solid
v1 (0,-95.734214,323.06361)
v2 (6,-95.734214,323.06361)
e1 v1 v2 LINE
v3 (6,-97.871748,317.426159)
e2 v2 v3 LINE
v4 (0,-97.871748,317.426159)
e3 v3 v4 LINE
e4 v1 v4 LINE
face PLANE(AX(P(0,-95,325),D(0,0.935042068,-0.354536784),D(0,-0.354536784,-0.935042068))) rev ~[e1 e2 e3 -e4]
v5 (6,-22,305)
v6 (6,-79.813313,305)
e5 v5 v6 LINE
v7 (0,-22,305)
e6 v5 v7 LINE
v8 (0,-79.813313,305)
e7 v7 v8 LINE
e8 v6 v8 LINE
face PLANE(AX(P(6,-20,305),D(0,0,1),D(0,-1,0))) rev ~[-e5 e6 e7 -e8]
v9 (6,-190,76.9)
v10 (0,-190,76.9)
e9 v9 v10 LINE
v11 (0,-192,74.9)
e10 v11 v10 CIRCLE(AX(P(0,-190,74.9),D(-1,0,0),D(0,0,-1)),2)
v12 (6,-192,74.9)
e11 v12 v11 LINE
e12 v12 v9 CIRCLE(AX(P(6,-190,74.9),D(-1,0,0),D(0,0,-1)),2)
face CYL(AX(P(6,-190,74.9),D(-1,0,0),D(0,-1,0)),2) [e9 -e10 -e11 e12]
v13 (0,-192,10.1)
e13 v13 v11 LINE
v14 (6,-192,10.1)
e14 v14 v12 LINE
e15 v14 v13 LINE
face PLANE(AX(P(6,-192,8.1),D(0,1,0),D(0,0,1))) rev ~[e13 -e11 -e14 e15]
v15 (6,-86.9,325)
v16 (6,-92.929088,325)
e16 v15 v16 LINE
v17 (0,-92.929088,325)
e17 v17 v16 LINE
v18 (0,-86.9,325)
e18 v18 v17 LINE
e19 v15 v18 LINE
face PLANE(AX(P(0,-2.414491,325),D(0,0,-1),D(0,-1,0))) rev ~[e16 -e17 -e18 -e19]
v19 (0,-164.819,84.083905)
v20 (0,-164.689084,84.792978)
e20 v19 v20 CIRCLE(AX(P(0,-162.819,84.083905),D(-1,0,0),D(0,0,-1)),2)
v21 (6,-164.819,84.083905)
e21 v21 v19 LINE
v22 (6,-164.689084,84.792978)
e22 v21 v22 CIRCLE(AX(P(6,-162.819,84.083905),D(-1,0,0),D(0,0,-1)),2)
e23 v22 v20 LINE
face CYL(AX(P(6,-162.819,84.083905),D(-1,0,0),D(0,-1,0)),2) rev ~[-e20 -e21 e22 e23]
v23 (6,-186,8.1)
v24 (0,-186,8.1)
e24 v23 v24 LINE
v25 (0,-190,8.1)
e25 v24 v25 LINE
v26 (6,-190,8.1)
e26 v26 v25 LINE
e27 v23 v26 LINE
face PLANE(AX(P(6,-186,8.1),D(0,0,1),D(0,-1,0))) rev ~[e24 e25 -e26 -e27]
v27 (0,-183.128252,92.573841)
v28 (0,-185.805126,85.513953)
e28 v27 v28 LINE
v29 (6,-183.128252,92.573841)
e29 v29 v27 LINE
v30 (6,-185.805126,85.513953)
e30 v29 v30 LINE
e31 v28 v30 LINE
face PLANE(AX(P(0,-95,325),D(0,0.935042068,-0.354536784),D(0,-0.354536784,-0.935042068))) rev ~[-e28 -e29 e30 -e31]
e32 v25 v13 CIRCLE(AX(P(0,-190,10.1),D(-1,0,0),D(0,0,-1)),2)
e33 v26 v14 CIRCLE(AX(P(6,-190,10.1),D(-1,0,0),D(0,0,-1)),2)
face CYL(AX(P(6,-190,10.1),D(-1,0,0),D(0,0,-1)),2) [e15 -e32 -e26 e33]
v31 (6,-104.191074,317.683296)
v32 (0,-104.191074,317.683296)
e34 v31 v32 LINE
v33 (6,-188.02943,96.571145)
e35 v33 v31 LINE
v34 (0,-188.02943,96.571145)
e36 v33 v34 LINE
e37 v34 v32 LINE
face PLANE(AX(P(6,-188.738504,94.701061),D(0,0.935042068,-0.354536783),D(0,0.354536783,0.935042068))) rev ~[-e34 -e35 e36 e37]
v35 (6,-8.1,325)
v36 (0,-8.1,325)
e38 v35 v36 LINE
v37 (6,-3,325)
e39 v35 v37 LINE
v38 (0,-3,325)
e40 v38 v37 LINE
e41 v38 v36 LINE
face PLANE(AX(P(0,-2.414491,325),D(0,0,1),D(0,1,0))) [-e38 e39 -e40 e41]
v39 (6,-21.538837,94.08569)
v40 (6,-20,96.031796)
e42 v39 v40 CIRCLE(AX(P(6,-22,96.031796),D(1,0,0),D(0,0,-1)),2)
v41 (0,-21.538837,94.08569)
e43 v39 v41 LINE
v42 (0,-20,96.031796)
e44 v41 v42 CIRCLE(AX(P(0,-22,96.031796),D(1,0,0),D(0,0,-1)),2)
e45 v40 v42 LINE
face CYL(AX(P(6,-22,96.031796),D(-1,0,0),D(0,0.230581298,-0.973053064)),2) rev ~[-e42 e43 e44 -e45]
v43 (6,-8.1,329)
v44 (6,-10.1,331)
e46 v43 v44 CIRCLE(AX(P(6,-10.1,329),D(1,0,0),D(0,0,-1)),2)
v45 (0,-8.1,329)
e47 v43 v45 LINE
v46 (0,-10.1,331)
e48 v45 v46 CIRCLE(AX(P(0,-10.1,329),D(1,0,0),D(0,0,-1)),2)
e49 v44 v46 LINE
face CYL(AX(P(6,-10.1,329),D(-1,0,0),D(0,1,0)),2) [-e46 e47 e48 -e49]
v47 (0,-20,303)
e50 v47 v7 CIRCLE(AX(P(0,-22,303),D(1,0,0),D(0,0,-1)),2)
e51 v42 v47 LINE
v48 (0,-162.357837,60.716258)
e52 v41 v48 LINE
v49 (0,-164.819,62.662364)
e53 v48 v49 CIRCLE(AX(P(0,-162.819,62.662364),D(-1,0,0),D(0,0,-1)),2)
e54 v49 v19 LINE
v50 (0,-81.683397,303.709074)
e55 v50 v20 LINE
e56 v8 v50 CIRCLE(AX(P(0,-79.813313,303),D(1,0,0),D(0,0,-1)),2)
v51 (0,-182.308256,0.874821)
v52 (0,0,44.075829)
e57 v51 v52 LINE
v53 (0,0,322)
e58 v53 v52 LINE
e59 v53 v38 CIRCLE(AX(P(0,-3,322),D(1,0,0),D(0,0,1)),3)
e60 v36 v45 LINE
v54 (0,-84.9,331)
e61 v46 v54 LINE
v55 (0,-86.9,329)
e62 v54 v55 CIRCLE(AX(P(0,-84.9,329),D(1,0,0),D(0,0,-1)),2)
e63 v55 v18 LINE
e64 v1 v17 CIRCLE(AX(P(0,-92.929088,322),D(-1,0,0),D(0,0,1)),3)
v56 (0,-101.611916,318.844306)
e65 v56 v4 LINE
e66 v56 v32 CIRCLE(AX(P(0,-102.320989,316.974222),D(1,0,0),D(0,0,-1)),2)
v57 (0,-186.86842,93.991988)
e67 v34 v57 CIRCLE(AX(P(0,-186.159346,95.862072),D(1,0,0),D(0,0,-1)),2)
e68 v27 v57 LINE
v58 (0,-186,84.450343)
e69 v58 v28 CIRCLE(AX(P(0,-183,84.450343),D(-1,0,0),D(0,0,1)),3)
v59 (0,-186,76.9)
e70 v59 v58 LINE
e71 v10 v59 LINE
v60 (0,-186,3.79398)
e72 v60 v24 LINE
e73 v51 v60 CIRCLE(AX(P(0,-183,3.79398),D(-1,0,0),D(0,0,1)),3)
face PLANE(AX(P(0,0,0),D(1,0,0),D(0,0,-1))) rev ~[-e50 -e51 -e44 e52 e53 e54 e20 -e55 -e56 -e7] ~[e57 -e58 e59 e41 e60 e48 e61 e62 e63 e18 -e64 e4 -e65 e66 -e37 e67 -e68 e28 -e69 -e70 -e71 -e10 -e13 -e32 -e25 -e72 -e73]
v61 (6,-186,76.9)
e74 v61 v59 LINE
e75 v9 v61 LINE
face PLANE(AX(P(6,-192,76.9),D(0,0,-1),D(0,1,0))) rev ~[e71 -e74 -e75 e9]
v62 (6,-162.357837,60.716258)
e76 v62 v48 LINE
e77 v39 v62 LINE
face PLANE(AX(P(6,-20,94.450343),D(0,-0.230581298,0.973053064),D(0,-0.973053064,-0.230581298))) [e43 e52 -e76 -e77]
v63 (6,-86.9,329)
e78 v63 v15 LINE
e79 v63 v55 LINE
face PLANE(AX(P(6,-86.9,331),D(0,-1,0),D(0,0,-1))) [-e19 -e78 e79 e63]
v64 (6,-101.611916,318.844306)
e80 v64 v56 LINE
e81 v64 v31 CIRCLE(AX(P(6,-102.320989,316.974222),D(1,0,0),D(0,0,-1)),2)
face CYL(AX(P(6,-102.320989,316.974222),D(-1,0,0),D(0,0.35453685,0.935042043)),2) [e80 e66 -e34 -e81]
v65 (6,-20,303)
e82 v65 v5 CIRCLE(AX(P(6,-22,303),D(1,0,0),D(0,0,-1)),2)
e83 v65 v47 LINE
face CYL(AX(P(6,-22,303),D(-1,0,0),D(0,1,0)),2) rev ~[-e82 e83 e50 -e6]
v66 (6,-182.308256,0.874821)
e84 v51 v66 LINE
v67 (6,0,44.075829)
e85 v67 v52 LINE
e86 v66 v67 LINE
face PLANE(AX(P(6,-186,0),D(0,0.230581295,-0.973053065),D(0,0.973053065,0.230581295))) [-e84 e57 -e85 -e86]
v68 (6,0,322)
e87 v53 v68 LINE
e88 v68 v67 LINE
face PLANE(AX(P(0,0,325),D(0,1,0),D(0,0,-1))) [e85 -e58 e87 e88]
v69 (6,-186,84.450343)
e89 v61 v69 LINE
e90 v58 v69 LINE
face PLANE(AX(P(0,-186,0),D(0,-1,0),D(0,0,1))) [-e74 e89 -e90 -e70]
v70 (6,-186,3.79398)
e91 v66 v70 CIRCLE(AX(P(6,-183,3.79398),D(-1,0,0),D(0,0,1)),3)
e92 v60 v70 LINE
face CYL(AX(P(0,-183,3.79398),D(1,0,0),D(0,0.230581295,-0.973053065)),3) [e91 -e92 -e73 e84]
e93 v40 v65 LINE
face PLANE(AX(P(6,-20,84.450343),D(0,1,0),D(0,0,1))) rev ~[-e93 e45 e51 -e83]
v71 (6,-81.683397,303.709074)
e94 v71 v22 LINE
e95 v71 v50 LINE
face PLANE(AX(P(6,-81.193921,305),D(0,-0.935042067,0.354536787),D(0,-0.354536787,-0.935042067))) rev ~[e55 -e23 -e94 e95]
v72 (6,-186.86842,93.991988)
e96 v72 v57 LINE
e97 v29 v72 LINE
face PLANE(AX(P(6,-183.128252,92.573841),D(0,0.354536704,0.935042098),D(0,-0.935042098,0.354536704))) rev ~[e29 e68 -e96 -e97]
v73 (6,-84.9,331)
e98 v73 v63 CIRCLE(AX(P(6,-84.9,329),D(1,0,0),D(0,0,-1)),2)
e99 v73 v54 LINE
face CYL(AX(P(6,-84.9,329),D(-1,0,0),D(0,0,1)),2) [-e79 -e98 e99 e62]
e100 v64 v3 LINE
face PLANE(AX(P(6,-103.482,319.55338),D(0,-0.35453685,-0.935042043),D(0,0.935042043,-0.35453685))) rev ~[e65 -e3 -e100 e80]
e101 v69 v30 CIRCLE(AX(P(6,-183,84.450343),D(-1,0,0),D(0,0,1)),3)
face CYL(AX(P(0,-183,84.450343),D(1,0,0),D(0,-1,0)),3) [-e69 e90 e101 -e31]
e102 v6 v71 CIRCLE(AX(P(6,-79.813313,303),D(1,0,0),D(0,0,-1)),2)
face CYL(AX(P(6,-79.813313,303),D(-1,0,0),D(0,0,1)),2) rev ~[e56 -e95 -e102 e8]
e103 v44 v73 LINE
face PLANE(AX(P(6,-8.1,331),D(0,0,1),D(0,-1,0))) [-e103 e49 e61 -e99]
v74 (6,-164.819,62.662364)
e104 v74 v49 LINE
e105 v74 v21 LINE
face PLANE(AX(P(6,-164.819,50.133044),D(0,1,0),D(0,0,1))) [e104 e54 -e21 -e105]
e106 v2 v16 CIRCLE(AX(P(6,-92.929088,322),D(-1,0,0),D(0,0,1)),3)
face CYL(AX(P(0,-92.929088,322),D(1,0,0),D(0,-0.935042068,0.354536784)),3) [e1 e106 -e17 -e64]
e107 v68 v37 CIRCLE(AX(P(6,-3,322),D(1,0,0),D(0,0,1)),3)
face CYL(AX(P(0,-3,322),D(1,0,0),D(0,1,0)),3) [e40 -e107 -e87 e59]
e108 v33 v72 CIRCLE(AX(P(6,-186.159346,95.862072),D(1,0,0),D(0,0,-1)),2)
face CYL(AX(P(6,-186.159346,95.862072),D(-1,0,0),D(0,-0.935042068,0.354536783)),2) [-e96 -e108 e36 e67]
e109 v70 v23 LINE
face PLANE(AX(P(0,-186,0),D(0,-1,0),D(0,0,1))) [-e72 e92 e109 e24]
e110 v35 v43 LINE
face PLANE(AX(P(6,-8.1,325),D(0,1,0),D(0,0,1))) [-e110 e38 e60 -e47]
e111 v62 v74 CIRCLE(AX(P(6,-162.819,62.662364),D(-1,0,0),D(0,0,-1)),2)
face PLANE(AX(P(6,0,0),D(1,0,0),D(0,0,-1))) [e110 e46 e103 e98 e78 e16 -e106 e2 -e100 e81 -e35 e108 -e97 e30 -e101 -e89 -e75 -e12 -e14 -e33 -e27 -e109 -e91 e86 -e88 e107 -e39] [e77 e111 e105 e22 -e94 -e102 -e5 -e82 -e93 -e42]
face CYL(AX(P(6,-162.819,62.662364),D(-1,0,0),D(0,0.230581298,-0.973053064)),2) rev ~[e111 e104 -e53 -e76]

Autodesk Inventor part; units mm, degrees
ref_plane "YZ Plane" through (0, 0, 0) normal (1, 0, 0) x (0, 1, 0)
ref_plane "XZ Plane" through (0, 0, 0) normal (0, 1, 0) x (-1, 0, 0)
ref_plane "XY Plane" through (0, 0, 0) normal (0, 0, 1) x (1, 0, 0)
sketch "Sketch1" plane through (0, 0, 0) normal (1, 0, 0) x (0, 1, 0)
  line L0 (0, 325) -> (0, 0)
  line L1 (0, 0) -> (-186, 0)
  line L2 (-186, 0) -> (-186, 85)
  line L3 (-2.414491, 325) -> (0, 325)
  line L4 (0, 325) -> (-95, 325)
  line L5 (-95, 325) -> (-186, 85)
  dimension "d0" = 325
  dimension "d1" = 186
  dimension "d2" = 85
  dimension "d3" = 95
  dimension "d33" = 240
  dimension "d34" = 91
extrude "Extrusion1" add sketch "Sketch1" along normal blind 6
sketch "Sketch2" plane through (6, 0, 0) normal (1, 0, 0) x (0, 0, -1)
  line L0 (-325, 0) -> (-325, -95) projected
  line L1 (-325, -8.1) -> (-331, -8.1)
  line L2 (-331, -8.1) -> (-331, -86.9)
  line L3 (-331, -86.9) -> (-325, -86.9)
  line L4 (-325, -86.9) -> (-325, -8.1)
  line L5 (-85, -186) -> (0, -186) projected
  line L6 (0, -186) -> (0, 0) projected
  line L7 (-76.9, -186) -> (-8.1, -186)
  line L8 (-8.1, -186) -> (-8.1, -192)
  line L9 (-8.1, -192) -> (-76.9, -192)
  line L10 (-76.9, -192) -> (-76.9, -186)
  line L11 (-325, -95) -> (-331, -86.9) construction
  line L12 (-325, 0) -> (-331, -8.1) construction
  dimension "d6" = 6
  dimension "d12" = 6
  dimension "d13" = 8.1
  dimension "d47" = 8.1
  dimension "d48" = 8.1
extrude "Extrusion2" add sketch "Sketch2" against normal blind 6
sketch "Sketch3" plane through (6, 0, 0) normal (1, 0, 0) x (0, 0, -1)
  line L0 (-317.426159, -97.871748) -> (-92.573841, -183.128252)
  line L1 (-92.573841, -183.128252) -> (-94.701061, -188.738504)
  line L2 (-94.701061, -188.738504) -> (-319.55338, -103.482)
  line L3 (-319.55338, -103.482) -> (-317.426159, -97.871748)
  line L4 (-325, -95) -> (-85, -186)
  dimension "d17" = 8.1
  dimension "d35" = 6
  dimension "d36" = 8.1
extrude "Extrusion3" add sketch "Sketch3" against normal blind 6
sketch "Sketch6" plane through (6, 0, 0) normal (1, 0, 0) x (0, 0, -1)
  line L0 (0, 0) -> (-325, 0) projected
  line L1 (0, -186) -> (0, 0) projected
  line L2 (0, -186) -> (-50, 25)
  line L3 (-50, 25) -> (0, 25)
  line L4 (0, 25) -> (0, -186)
  dimension "d38" = 50
  dimension "d39" = 25
extrude "Extrusion6" cut sketch "Sketch6" against normal through all
fillet "Fillet2" radius 3 4 edges at (3, 0, 325) (3, -95, 325) (3, -186, 85) (3, -186, 0)
fillet "Fillet3" radius 2 6 edges at (3, -192, 8.1) (3, -192, 76.9) (3, -188.7385, 94.7011) (3, -103.482, 319.5534) (3, -86.9, 331) (3, -8.1, 331)
sketch "Sketch4" plane through (6, 0, 0) normal (1, 0, 0) x (0, 0, -1)
  line L0 (-323.06361, -95.734214) -> (-85.513953, -185.805126)
  line L1 (-323.06361, -95.734214) -> (-85.513953, -185.805126)
  line L2 (-44.075829, 0) -> (-322, 0)
  line L3 (-325, -3) -> (-325, -8.1)
  line L4 (-325, -8.1) -> (-329, -8.1)
  line L5 (-305, -20) -> (-305, -81.193921)
  line L6 (-305, -81.193921) -> (-84.450343, -164.819)
  line L7 (-84.450343, -164.819) -> (-84.450343, -20)
  line L8 (-84.450343, -20) -> (-305, -20)
  arc A0 (-85.513953, -185.805126) -> (-84.450343, -186) centre (-84.450343, -183) ccw
  line L9 (-8.1, -186) -> (-3.79398, -186)
  point P0 (-191.521346, -165.651434)
  point P1 (-106.085382, -201.605735)
  point P2 (-3, 0)
  point P3 (0, 0)
  dimension "d24" = 20
  dimension "d26" = 20
  dimension "d27" = 20
extrude "Extrusion4" cut sketch "Sketch4" against normal through all
sketch "Sketch7" plane through (6, 0, 0) normal (1, 0, 0) x (0, 0, -1)
  line L0 (-84.450343, -20) -> (-84.450343, -164.819)
  line L1 (-0.874821, -182.308256) -> (-44.075829, 0)
  line L2 (-84.450343, -164.819) -> (-84.450343, -20)
  line L3 (-84.450343, -20) -> (-50.133044, -164.819)
  line L4 (-50.133044, -164.819) -> (-84.450343, -164.819)
  point P0 (0, 0)
extrude "Extrusion7" cut sketch "Sketch7" against normal through all
sketch "Sketch8" plane through (6, 0, 0) normal (1, 0, 0) x (0, 0, -1)
  line L0 (-84.450343, -20) -> (-50.133044, -164.819)
  line L1 (-50.133044, -164.819) -> (-84.450343, -164.819)
  line L2 (-305, -20) -> (-84.450343, -20)
  line L3 (-50.133044, -164.819) -> (-84.450343, -20)
  line L4 (-84.450343, -20) -> (-94.450343, -20)
  line L5 (-50.133044, -164.819) -> (-60.133044, -164.819)
  line L6 (-94.450343, -20) -> (-60.133044, -164.819)
  point P0 (0, 0)
  dimension "d44" = 10
extrude "Extrusion8" add sketch "Sketch8" against normal blind 6
fillet "Fillet4" radius 2 5 edges at (3, -164.819, 84.4503) (3, -164.819, 60.133) (3, -20, 94.4503) (3, -20, 305) (3, -81.1939, 305)
equation "\"d26\" = d24"
equation "\"d27\" = d24"
properties part number "TopSidePanel-Left"
